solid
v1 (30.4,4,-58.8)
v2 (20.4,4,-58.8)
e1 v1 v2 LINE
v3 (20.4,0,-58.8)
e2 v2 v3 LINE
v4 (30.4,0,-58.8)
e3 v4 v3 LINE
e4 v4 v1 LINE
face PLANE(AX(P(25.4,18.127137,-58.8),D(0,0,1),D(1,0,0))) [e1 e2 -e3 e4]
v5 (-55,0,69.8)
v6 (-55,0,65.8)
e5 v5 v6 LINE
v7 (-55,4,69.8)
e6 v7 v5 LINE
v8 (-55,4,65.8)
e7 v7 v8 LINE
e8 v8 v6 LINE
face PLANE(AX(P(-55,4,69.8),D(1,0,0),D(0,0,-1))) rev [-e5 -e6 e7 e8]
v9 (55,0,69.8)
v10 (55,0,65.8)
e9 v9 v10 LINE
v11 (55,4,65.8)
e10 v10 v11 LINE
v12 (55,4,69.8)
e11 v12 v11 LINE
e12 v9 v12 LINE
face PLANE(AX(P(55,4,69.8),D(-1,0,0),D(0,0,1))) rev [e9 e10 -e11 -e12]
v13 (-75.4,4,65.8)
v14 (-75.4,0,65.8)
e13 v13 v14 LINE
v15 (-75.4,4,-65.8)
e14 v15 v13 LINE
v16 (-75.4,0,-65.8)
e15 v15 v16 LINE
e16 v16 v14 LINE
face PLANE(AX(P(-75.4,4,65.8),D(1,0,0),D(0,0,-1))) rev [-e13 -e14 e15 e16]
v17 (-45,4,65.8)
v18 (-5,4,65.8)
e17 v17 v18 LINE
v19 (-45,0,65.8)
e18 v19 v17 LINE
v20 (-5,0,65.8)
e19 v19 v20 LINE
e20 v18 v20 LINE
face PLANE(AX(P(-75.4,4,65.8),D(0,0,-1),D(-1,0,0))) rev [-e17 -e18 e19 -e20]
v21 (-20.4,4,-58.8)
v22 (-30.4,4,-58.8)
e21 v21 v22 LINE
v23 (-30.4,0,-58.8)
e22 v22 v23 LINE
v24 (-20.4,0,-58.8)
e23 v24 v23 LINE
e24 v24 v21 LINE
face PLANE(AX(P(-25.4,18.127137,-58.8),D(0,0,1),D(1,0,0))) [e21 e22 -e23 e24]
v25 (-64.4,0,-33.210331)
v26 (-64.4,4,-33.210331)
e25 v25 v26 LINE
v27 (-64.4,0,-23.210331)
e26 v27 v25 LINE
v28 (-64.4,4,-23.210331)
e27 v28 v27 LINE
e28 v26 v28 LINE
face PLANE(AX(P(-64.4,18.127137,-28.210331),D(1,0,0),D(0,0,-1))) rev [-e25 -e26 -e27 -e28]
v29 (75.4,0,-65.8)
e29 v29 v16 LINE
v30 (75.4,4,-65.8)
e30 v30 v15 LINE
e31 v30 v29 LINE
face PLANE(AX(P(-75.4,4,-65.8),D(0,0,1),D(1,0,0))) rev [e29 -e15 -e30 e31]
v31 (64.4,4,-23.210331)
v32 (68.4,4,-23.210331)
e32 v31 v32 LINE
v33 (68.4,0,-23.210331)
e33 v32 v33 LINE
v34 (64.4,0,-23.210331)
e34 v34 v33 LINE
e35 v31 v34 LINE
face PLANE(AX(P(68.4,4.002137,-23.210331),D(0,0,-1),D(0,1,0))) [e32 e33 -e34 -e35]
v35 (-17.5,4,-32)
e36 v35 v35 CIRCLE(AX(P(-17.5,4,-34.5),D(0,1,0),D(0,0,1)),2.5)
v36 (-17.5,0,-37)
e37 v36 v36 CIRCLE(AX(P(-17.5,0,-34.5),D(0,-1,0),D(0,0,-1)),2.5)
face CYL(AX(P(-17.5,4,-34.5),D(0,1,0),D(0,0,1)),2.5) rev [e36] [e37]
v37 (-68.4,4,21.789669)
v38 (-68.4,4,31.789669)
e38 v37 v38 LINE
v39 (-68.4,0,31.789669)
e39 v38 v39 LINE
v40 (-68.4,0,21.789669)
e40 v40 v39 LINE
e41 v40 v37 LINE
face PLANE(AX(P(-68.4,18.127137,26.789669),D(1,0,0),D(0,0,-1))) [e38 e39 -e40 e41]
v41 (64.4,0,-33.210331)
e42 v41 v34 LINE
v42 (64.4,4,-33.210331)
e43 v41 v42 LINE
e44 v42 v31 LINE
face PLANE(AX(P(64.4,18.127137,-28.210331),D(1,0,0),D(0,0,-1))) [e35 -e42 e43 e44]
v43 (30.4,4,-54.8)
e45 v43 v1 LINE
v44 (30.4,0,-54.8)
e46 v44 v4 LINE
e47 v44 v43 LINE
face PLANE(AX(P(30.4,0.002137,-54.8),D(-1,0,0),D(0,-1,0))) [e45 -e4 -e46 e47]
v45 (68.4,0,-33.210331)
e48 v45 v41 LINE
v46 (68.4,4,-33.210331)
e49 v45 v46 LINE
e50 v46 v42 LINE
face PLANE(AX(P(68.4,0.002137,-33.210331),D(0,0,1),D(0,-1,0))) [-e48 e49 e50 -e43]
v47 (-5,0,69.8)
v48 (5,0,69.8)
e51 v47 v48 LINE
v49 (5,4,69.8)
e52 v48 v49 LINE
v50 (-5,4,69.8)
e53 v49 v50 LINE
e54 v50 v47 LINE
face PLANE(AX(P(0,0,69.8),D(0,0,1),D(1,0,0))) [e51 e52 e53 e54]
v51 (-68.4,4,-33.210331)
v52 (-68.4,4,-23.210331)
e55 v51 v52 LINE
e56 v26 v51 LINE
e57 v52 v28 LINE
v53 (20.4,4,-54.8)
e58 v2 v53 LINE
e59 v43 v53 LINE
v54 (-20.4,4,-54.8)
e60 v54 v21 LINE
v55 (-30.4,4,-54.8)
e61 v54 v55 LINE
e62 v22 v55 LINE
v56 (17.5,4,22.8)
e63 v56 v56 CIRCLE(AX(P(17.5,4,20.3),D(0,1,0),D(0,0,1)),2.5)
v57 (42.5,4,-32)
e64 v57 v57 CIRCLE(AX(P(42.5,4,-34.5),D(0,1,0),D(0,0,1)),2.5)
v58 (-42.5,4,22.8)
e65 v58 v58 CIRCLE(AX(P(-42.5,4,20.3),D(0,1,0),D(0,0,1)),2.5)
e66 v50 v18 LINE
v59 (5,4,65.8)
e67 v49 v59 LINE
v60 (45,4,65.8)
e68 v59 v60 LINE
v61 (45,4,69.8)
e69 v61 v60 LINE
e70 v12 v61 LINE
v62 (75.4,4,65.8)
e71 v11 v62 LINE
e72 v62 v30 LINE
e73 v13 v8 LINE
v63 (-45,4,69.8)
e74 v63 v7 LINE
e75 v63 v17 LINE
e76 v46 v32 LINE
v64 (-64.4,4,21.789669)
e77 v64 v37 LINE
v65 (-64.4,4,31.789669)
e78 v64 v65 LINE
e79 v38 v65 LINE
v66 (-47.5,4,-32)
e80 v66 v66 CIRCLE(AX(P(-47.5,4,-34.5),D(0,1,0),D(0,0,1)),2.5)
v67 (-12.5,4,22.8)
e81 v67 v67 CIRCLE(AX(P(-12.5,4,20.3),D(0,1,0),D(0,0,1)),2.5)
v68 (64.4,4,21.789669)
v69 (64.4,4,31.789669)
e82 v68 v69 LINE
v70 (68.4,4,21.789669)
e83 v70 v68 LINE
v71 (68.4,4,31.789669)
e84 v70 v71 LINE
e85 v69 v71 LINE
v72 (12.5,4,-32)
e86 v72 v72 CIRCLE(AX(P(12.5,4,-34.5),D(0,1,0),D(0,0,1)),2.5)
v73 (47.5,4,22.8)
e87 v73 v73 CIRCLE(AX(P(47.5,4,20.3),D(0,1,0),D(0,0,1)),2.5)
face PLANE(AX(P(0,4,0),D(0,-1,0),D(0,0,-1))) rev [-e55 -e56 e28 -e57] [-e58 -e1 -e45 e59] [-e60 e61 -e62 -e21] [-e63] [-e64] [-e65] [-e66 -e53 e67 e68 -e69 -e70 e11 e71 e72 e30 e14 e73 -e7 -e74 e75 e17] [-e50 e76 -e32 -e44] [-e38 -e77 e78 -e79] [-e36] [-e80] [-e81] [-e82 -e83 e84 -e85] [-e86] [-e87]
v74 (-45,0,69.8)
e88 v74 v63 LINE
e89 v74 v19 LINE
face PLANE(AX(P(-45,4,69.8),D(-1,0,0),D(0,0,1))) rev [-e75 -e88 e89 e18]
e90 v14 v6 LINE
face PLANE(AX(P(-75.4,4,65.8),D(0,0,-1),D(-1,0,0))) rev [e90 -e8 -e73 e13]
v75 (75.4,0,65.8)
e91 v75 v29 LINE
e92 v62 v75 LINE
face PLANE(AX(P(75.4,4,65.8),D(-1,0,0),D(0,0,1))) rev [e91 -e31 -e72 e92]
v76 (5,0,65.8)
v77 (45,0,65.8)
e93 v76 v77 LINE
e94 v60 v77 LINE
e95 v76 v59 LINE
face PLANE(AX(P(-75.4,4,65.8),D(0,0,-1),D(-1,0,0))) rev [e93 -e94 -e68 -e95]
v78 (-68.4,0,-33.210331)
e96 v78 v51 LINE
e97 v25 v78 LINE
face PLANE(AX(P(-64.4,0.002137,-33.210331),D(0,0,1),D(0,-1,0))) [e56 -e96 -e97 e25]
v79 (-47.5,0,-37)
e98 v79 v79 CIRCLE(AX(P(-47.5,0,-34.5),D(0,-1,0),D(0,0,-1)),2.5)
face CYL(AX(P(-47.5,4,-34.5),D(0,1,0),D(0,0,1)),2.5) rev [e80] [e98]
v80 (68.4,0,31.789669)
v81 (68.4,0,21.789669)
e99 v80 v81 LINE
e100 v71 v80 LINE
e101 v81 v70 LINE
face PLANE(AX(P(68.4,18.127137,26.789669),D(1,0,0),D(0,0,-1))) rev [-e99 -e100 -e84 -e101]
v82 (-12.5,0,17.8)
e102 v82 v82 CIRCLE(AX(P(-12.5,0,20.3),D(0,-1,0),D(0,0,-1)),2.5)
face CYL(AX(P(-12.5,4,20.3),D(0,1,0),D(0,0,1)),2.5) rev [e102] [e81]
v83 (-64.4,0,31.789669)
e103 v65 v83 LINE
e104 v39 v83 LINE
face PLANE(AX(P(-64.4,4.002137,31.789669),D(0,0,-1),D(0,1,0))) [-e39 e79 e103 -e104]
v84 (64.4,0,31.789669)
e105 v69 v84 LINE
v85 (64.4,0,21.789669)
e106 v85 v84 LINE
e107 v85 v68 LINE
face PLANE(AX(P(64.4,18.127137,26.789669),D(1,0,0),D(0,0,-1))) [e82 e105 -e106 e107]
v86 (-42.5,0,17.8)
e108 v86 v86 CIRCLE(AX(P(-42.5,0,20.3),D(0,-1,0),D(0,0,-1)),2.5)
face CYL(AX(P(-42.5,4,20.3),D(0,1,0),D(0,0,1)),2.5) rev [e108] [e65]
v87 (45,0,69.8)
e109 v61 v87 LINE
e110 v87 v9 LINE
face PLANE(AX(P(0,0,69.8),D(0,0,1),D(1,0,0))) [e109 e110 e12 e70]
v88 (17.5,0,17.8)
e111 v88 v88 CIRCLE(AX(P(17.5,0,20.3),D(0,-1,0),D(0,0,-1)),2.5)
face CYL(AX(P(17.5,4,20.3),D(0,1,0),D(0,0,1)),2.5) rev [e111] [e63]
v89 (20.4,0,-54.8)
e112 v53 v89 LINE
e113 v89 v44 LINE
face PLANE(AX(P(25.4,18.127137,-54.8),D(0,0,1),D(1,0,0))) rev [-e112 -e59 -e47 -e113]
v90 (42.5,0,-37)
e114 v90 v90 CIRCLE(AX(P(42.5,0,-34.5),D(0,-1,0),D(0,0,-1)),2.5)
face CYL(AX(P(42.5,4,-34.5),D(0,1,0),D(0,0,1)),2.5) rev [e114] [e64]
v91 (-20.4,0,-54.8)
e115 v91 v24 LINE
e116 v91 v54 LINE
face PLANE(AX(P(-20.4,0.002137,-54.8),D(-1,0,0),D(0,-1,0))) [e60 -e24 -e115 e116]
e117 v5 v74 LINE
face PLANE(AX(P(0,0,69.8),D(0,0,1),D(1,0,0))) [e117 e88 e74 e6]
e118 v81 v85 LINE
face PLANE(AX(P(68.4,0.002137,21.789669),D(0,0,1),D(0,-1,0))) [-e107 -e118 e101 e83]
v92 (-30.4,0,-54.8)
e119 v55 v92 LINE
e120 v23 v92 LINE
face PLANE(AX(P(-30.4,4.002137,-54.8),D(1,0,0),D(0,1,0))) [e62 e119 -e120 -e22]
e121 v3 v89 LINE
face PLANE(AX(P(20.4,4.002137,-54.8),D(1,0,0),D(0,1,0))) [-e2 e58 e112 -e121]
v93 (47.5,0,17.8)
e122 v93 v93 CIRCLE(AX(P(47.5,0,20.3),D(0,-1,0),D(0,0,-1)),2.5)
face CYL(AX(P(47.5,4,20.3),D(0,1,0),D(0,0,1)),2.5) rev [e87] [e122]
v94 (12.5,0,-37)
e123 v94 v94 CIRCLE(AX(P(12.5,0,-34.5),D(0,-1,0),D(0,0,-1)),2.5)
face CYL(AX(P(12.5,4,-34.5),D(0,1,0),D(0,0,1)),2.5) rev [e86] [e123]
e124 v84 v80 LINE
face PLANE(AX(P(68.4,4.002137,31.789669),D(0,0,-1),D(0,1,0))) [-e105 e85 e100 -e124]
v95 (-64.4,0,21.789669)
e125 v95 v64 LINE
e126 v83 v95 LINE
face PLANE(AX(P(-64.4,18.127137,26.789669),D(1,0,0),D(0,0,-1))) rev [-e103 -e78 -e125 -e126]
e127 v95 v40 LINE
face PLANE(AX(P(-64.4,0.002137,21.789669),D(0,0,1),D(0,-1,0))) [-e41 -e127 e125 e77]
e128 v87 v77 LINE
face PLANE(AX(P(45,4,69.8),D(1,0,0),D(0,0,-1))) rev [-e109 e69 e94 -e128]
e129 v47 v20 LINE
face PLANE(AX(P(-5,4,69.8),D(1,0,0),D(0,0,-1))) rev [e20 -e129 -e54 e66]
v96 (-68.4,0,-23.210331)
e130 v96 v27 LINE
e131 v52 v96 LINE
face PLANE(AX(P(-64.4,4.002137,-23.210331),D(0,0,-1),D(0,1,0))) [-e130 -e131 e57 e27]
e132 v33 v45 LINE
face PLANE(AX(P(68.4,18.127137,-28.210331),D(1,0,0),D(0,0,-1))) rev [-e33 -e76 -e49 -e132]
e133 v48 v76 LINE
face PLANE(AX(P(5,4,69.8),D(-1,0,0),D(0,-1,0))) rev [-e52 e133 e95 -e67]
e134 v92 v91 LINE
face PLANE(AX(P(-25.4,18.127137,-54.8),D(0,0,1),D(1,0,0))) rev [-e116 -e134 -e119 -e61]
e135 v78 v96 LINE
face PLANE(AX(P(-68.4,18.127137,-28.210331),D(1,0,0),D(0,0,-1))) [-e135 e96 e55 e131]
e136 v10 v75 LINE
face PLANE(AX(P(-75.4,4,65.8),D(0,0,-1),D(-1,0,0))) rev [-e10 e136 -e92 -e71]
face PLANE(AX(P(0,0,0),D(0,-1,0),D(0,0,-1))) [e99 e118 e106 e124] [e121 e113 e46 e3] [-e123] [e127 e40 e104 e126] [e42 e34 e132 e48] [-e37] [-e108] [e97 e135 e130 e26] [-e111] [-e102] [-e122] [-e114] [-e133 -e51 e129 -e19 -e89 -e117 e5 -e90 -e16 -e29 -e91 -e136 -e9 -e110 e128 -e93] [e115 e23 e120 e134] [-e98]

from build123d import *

# Parameters (mm, degrees)
SKETCH1_W               = 150.8
SKETCH1_H               = 131.6
BOSS_EXTRUDE1_DEPTH     = 4
F_5_0MM_DOWEL_HOLE1_D   = 5
F_5_0MM_DOWEL_HOLE2_D   = 5
CAVITY1_START           = -58.8
CAVITY1_OUTLINE_W       = 10
CAVITY1_OUTLINE_H       = 3.997862951
CAVITY1_DEPTH           = 4
CAVITY1_START_2         = -33.210330997
CAVITY1_2_OUTLINE_W     = 4
CAVITY1_2_OUTLINE_H     = 3.997862951
CAVITY1_2_DEPTH         = 10
CAVITY1_START_3         = 21.789669003
CAVITY1_3_OUTLINE_W     = 4
CAVITY1_3_OUTLINE_H     = 3.997862951
CAVITY1_3_DEPTH         = 10
CUT_EXTRUDE6_DEPTH      = 101.153796274
CUT_EXTRUDE6_DEPTH_BACK = 101.153796274
SKETCH14_W              = 4
SKETCH14_H              = 10
SKETCH14_W_2            = 10
SKETCH14_H_2            = 4
SKETCH15_W              = 10
SKETCH15_H              = 4
BOSS_EXTRUDE2_DEPTH     = 4


# Read off the part's stored shape, not the designer's step: Cavity1
with BuildPart() as part:
    # Sketch1 → Boss-Extrude1 (new body)
    with BuildSketch(Plane(origin=(0, 0, 0), x_dir=(1, 0, 0), z_dir=(0, 1, 0))):
        Rectangle(SKETCH1_W, SKETCH1_H)
    extrude(amount=BOSS_EXTRUDE1_DEPTH)

    # Ø5.0mm Dowel Hole1 (through all)
    with Locations(Plane(origin=(0, 4, 0), x_dir=(1, 0, 0), z_dir=(0, 1, 0))):
        with Locations((-42.5, -20.3)):
            Hole(F_5_0MM_DOWEL_HOLE1_D / 2)

    # Ø5.0mm Dowel Hole2 (through all)
    with Locations(Plane(origin=(0, 4, 0), x_dir=(1, 0, 0), z_dir=(0, 1, 0))):
        with Locations((-12.5, -20.3), (17.5, -20.3), (47.5, -20.3), (-47.5, 34.5), (-17.5, 34.5), (12.5, 34.5), (42.5, 34.5)):
            Hole(F_5_0MM_DOWEL_HOLE2_D / 2)

    # Cavity1 outline → Cavity1 (cut)
    with BuildSketch(Plane.XY.offset(CAVITY1_START)):
        with Locations((25.4, 2.001068524)):
            Rectangle(CAVITY1_OUTLINE_W, CAVITY1_OUTLINE_H)
        with Locations((-25.4, 2.001068524)):
            Rectangle(CAVITY1_OUTLINE_W, CAVITY1_OUTLINE_H)
    extrude(amount=CAVITY1_DEPTH, mode=Mode.SUBTRACT)

    # Cavity1 2 outline → Cavity1 2 (cut)
    with BuildSketch(Plane.XY.offset(CAVITY1_START_2)):
        with Locations((-66.4, 2.001068524)):
            Rectangle(CAVITY1_2_OUTLINE_W, CAVITY1_2_OUTLINE_H)
        with Locations((66.4, 2.001068524)):
            Rectangle(CAVITY1_2_OUTLINE_W, CAVITY1_2_OUTLINE_H)
    extrude(amount=CAVITY1_2_DEPTH, mode=Mode.SUBTRACT)

    # Cavity1 3 outline → Cavity1 3 (cut)
    with BuildSketch(Plane.XY.offset(CAVITY1_START_3)):
        with Locations((-66.4, 2.001068524)):
            Rectangle(CAVITY1_3_OUTLINE_W, CAVITY1_3_OUTLINE_H)
        with Locations((66.4, 2.001068524)):
            Rectangle(CAVITY1_3_OUTLINE_W, CAVITY1_3_OUTLINE_H)
    extrude(amount=CAVITY1_3_DEPTH, mode=Mode.SUBTRACT)

    # Sketch14 → Cut-Extrude6 (cut, two sides: drawn at the far end of the back side and taken through both)
    with BuildSketch(Plane(origin=(0, 0.002137049, 0), x_dir=(1, 0, 0), z_dir=(0, 1, 0)).offset(-CUT_EXTRUDE6_DEPTH_BACK)):
        with Locations((-66.4, -26.789669003)):
            Rectangle(SKETCH14_W, SKETCH14_H)
        with Locations((-66.4, 28.210330997)):
            Rectangle(SKETCH14_W, SKETCH14_H)
        with Locations((25.4, 56.8)):
            Rectangle(SKETCH14_W_2, SKETCH14_H_2)
        with Locations((-25.4, 56.8)):
            Rectangle(SKETCH14_W_2, SKETCH14_H_2)
        with Locations((66.4, 28.210330997)):
            Rectangle(SKETCH14_W, SKETCH14_H)
        with Locations((66.4, -26.789669003)):
            Rectangle(SKETCH14_W, SKETCH14_H)
    extrude(amount=CUT_EXTRUDE6_DEPTH + CUT_EXTRUDE6_DEPTH_BACK, mode=Mode.SUBTRACT)

    # Sketch15 → Boss-Extrude2 (add)
    with BuildSketch(Plane.XY.offset(65.8)):
        with Locations((-50, 2)):
            Rectangle(SKETCH15_W, SKETCH15_H)
        with Locations((0, 2)):
            Rectangle(SKETCH15_W, SKETCH15_H)
        with Locations((50, 2)):
            Rectangle(SKETCH15_W, SKETCH15_H)
    extrude(amount=BOSS_EXTRUDE2_DEPTH)


solid = part.part
